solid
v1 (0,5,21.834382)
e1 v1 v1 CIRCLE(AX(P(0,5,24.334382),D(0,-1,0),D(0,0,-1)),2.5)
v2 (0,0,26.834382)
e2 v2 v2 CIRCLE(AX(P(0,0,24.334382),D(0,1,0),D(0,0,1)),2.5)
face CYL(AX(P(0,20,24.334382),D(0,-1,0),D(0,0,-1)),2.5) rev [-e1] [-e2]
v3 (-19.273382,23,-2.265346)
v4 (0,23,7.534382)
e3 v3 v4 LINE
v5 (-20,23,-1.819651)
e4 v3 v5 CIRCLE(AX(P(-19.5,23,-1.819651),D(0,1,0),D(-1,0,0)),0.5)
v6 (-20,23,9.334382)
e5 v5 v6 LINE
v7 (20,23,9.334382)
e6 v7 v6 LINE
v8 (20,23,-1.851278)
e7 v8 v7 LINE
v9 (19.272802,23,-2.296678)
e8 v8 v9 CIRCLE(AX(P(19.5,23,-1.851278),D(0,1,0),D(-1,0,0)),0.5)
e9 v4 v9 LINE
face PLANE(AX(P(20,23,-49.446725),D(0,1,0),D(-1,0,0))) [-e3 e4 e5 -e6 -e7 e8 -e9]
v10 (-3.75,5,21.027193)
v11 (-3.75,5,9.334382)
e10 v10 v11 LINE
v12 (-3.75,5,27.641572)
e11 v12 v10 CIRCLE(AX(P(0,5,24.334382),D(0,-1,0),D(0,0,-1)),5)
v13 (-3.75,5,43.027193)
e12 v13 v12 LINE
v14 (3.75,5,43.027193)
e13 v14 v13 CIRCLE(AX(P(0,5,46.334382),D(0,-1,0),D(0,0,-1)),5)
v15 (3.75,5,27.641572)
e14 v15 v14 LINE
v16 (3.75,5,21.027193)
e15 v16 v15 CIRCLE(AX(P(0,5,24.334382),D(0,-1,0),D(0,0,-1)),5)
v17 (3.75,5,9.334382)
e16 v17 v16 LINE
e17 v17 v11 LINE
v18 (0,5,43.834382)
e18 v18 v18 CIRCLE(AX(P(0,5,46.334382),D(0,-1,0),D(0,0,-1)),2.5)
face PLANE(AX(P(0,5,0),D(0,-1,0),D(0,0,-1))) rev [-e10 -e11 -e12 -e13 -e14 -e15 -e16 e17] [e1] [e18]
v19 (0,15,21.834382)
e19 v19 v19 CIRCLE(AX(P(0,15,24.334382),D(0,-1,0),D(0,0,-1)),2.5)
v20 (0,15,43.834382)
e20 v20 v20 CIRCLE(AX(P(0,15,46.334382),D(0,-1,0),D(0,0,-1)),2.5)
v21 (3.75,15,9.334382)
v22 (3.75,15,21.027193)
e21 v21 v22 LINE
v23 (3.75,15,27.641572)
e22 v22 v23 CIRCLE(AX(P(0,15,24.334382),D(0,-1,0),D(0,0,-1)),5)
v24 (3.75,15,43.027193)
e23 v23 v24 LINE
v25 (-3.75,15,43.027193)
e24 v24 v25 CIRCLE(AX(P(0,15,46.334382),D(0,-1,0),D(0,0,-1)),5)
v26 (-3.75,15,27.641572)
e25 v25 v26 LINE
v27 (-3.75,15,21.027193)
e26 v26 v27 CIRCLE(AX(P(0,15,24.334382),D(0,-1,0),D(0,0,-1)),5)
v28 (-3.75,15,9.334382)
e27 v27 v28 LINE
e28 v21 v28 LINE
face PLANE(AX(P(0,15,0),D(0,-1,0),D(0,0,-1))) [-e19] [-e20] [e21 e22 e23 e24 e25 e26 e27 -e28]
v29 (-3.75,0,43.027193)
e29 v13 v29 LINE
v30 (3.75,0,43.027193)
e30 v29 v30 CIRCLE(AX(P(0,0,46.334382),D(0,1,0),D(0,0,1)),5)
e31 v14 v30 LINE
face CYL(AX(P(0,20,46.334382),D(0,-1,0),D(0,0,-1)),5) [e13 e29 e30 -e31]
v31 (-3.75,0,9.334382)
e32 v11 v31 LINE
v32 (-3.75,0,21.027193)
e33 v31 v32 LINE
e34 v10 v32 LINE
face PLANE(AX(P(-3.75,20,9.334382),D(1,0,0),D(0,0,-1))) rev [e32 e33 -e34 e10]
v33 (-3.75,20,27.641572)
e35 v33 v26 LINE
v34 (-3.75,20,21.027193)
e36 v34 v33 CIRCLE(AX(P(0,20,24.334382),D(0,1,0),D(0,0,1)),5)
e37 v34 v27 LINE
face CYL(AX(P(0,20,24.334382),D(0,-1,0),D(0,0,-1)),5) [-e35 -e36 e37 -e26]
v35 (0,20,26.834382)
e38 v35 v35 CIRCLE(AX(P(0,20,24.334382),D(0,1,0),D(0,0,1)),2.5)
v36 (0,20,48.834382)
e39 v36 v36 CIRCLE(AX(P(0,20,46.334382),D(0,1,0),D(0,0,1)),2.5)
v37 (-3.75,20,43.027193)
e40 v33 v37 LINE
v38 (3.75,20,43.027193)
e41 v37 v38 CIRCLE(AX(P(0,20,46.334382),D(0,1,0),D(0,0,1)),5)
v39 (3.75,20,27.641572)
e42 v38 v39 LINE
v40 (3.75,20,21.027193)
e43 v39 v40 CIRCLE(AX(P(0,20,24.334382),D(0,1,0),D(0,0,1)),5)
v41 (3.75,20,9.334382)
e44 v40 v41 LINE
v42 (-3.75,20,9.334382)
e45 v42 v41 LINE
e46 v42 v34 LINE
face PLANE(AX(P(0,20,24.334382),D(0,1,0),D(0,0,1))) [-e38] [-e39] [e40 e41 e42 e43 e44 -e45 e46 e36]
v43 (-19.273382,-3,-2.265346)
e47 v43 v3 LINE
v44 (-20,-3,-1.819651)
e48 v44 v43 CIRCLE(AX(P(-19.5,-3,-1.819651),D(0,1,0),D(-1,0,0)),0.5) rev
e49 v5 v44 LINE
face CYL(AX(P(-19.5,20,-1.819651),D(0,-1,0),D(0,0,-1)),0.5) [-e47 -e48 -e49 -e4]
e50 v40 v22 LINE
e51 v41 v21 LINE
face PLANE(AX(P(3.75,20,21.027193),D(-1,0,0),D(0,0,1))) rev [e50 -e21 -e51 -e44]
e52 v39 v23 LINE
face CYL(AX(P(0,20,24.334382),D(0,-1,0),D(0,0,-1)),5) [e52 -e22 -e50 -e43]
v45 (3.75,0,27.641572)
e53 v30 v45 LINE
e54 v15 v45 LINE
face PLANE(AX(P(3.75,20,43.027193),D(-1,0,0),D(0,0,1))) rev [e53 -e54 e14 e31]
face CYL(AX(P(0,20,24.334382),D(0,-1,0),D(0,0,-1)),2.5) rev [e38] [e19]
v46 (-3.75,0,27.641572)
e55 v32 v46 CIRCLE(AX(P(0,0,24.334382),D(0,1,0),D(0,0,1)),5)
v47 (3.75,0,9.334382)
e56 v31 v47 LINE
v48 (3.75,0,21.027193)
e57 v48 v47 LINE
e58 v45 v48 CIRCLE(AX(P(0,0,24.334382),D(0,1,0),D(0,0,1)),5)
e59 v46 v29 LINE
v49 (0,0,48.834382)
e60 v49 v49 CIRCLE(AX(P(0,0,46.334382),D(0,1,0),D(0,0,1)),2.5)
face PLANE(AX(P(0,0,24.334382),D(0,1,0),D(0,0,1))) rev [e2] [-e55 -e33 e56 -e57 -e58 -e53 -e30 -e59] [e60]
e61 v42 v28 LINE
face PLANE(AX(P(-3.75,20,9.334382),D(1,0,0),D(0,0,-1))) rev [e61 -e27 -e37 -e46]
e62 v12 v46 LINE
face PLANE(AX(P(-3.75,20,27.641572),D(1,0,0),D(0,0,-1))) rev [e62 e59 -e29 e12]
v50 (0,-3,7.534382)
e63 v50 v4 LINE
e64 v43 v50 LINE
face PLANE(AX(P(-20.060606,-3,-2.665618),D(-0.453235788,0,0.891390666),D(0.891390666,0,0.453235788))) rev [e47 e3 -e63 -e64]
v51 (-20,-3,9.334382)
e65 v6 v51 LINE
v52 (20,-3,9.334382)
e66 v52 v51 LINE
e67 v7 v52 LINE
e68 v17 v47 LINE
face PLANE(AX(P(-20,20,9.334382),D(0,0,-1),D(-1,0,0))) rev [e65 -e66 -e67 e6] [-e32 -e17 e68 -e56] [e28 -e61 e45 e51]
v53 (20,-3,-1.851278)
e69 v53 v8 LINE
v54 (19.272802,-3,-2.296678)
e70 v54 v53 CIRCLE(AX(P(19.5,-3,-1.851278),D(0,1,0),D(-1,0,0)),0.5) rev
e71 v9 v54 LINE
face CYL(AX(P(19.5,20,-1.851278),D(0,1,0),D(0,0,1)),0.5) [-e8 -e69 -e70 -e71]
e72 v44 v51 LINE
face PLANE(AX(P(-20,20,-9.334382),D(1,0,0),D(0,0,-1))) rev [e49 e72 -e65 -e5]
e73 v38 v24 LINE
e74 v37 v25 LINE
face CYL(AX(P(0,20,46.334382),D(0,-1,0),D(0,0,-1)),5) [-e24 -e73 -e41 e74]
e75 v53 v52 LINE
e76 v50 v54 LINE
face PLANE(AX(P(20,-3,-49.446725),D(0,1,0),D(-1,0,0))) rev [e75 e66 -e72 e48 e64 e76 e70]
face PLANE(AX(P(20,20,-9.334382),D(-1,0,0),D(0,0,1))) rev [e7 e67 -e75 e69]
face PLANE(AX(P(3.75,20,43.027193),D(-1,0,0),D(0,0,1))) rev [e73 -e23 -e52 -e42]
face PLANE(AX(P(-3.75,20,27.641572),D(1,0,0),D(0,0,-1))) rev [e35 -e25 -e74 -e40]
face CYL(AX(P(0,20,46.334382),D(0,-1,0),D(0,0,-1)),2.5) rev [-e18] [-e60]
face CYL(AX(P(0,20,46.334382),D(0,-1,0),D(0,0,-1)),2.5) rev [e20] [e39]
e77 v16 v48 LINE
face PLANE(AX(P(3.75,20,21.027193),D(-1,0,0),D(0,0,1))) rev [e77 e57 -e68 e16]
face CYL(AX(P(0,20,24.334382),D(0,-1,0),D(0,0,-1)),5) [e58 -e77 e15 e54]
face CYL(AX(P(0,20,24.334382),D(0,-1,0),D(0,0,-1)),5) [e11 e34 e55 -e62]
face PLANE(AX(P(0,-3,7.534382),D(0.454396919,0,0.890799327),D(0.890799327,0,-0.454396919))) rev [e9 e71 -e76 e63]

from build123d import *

# Parameters (mm, degrees)
SKETCH1_R               = 2.5
BOSS_EXTRUDE1_DEPTH     = 20
CUT_EXTRUDE1_DEPTH      = 5
CUT_EXTRUDE1_DEPTH_BACK = 5
SKETCH2_W               = 23.75
SKETCH2_H               = 48.430343558
SKETCH3_W               = 40
SKETCH3_H               = 3
BOSS_EXTRUDE2_DEPTH     = 18.668764839
CUT_EXTRUDE2_DEPTH      = 61.919773624
SKETCH5_W               = 6.668765996
SKETCH5_H               = 26
CUT_EXTRUDE3_DEPTH      = 20
FILLET1_R               = 0.5
FILLET3_START           = -4
FILLET3_DEPTH           = 28


with BuildPart() as part:
    # Sketch1 → Boss-Extrude1 (new body)
    with BuildSketch(Plane(origin=(0, 0, 0), x_dir=(1, 0, 0), z_dir=(0, 1, 0))):
        with BuildLine():
            Line((-20, 9.33438242), (20, 9.33438242))
            Line((20, 9.33438242), (20, -9.33438242))
            Line((20, -9.33438242), (3.75, -9.33438242))
            Line((3.75, -9.33438242), (3.75, -21.027193281))
            ThreePointArc((3.75, -21.027193281), (5, -24.33438242), (3.75, -27.641571559))
            Line((3.75, -27.641571559), (3.75, -43.027193281))
            ThreePointArc((3.75, -43.027193281), (0, -51.33438242), (-3.75, -43.027193281))
            Line((-3.75, -43.027193281), (-3.75, -27.641571559))
            ThreePointArc((-3.75, -27.641571559), (-5, -24.33438242), (-3.75, -21.027193281))
            Line((-3.75, -21.027193281), (-3.75, -9.33438242))
            Line((-3.75, -9.33438242), (-20, -9.33438242))
            Line((-20, -9.33438242), (-20, 9.33438242))
        make_face()
        with Locations(Location((0, -24.33438242, 0), (0, 0, 270))):
            Circle(SKETCH1_R, mode=Mode.SUBTRACT)
        with Locations(Location((0, -46.33438242, 0), (0, 0, 270))):
            Circle(SKETCH1_R, mode=Mode.SUBTRACT)
    extrude(amount=BOSS_EXTRUDE1_DEPTH)

    # Sketch2 → Cut-Extrude1 (cut, two sides: drawn at the far end of the back side and taken through both)
    with BuildSketch(Plane(origin=(0, 10, 0), x_dir=(1, 0, 0), z_dir=(0, 1, 0)).offset(-CUT_EXTRUDE1_DEPTH_BACK)):
        with Locations((0, -33.549554199)):
            Rectangle(SKETCH2_W, SKETCH2_H)
    extrude(amount=CUT_EXTRUDE1_DEPTH + CUT_EXTRUDE1_DEPTH_BACK, mode=Mode.SUBTRACT)

    # Sketch3 → Boss-Extrude2 (add)
    with BuildSketch(Plane.XY.offset(9.33438242)):
        with Locations((0, 21.5)):
            Rectangle(SKETCH3_W, SKETCH3_H)
    boss_extrude2 = extrude(amount=-BOSS_EXTRUDE2_DEPTH)

    # Mirror1: Boss-Extrude2 across plane
    add(boss_extrude2.mirror(Plane.ZX.offset(10)))

    # Sketch4 → Cut-Extrude2 (cut, through all)
    with BuildSketch(Plane(origin=(0, 23, 0), x_dir=(1, 0, 0), z_dir=(0, 1, 0))):
        Polygon((-20.060606499, 2.66561758), (0, -7.53438242), (19.99607118, 2.66561758), (20, 9.33438242), (-20, 9.33438242), align=None)
    extrude(amount=-CUT_EXTRUDE2_DEPTH, mode=Mode.SUBTRACT)

    # Sketch5 → Cut-Extrude3 (cut)
    with BuildSketch(Plane(origin=(19.994493824, 0, 0.011779509), x_dir=(-0.0005891375272774049, 0, 0.999999826458472), z_dir=(-0.9999998264584721, 0, -0.0005891375272774049))):
        with Locations((-6.011780552, 10)):
            Rectangle(SKETCH5_W, SKETCH5_H)
    extrude(amount=-CUT_EXTRUDE3_DEPTH, mode=Mode.SUBTRACT)

    # Fillet1
    # the kernel refuses this fillet: 0.5 mm, written as the material it takes off along each edge
    with BuildSketch(Plane(origin=(-20, -5.037877222, -2.634801648), x_dir=(0, 0, 1), z_dir=(0, 1, 0))) as fillet1_piece_1:
        with BuildLine():
            CenterArc((FILLET1_R * 1.6303017777, FILLET1_R), FILLET1_R, 153.048520929, 116.951479071)
            Line((FILLET1_R * 0.738911111215, FILLET1_R * 1.4532357882), (0, 0))
            Line((0, 0), (FILLET1_R * 1.6303017777, 0))
        make_face()
    extrude(amount=30.075754444, mode=Mode.SUBTRACT)
    with BuildSketch(Plane(origin=(20, 23.156386842, -2.665615266), x_dir=(0, 0, 1), z_dir=(0, -1, 0))) as fillet1_piece_2:
        with BuildLine():
            CenterArc((0.062554737, 0.5), FILLET1_R, 262.81265488, 7.18734512)
            Line((-2.315e-06, 0.00392882), (0, 0))
            Line((0, 0), (0.062554737, 0))
        make_face()
    extrude(amount=26.312773684, mode=Mode.SUBTRACT)

    # Fillet3: read off the stored shape, not the designer's step
    # Fillet3 outline → Fillet3 (cut)
    with BuildSketch(Plane(origin=(0, 0, 0), x_dir=(1, 0, 0), z_dir=(0, 1, 0)).offset(FILLET3_START)):
        with BuildLine():
            ThreePointArc((19.272801541, 2.296677589), (19.761152035, 2.277657587), (20, 1.851277926))
            Line((20, 1.851277926), (20, 2.603060529))
            ThreePointArc((20, 2.603060529), (19.999016828, 2.63440068), (19.99607118, 2.66561758))
            Line((19.99607118, 2.66561758), (19.272801541, 2.296677589))
        make_face()
    extrude(amount=FILLET3_DEPTH, mode=Mode.SUBTRACT)


solid = part.part
